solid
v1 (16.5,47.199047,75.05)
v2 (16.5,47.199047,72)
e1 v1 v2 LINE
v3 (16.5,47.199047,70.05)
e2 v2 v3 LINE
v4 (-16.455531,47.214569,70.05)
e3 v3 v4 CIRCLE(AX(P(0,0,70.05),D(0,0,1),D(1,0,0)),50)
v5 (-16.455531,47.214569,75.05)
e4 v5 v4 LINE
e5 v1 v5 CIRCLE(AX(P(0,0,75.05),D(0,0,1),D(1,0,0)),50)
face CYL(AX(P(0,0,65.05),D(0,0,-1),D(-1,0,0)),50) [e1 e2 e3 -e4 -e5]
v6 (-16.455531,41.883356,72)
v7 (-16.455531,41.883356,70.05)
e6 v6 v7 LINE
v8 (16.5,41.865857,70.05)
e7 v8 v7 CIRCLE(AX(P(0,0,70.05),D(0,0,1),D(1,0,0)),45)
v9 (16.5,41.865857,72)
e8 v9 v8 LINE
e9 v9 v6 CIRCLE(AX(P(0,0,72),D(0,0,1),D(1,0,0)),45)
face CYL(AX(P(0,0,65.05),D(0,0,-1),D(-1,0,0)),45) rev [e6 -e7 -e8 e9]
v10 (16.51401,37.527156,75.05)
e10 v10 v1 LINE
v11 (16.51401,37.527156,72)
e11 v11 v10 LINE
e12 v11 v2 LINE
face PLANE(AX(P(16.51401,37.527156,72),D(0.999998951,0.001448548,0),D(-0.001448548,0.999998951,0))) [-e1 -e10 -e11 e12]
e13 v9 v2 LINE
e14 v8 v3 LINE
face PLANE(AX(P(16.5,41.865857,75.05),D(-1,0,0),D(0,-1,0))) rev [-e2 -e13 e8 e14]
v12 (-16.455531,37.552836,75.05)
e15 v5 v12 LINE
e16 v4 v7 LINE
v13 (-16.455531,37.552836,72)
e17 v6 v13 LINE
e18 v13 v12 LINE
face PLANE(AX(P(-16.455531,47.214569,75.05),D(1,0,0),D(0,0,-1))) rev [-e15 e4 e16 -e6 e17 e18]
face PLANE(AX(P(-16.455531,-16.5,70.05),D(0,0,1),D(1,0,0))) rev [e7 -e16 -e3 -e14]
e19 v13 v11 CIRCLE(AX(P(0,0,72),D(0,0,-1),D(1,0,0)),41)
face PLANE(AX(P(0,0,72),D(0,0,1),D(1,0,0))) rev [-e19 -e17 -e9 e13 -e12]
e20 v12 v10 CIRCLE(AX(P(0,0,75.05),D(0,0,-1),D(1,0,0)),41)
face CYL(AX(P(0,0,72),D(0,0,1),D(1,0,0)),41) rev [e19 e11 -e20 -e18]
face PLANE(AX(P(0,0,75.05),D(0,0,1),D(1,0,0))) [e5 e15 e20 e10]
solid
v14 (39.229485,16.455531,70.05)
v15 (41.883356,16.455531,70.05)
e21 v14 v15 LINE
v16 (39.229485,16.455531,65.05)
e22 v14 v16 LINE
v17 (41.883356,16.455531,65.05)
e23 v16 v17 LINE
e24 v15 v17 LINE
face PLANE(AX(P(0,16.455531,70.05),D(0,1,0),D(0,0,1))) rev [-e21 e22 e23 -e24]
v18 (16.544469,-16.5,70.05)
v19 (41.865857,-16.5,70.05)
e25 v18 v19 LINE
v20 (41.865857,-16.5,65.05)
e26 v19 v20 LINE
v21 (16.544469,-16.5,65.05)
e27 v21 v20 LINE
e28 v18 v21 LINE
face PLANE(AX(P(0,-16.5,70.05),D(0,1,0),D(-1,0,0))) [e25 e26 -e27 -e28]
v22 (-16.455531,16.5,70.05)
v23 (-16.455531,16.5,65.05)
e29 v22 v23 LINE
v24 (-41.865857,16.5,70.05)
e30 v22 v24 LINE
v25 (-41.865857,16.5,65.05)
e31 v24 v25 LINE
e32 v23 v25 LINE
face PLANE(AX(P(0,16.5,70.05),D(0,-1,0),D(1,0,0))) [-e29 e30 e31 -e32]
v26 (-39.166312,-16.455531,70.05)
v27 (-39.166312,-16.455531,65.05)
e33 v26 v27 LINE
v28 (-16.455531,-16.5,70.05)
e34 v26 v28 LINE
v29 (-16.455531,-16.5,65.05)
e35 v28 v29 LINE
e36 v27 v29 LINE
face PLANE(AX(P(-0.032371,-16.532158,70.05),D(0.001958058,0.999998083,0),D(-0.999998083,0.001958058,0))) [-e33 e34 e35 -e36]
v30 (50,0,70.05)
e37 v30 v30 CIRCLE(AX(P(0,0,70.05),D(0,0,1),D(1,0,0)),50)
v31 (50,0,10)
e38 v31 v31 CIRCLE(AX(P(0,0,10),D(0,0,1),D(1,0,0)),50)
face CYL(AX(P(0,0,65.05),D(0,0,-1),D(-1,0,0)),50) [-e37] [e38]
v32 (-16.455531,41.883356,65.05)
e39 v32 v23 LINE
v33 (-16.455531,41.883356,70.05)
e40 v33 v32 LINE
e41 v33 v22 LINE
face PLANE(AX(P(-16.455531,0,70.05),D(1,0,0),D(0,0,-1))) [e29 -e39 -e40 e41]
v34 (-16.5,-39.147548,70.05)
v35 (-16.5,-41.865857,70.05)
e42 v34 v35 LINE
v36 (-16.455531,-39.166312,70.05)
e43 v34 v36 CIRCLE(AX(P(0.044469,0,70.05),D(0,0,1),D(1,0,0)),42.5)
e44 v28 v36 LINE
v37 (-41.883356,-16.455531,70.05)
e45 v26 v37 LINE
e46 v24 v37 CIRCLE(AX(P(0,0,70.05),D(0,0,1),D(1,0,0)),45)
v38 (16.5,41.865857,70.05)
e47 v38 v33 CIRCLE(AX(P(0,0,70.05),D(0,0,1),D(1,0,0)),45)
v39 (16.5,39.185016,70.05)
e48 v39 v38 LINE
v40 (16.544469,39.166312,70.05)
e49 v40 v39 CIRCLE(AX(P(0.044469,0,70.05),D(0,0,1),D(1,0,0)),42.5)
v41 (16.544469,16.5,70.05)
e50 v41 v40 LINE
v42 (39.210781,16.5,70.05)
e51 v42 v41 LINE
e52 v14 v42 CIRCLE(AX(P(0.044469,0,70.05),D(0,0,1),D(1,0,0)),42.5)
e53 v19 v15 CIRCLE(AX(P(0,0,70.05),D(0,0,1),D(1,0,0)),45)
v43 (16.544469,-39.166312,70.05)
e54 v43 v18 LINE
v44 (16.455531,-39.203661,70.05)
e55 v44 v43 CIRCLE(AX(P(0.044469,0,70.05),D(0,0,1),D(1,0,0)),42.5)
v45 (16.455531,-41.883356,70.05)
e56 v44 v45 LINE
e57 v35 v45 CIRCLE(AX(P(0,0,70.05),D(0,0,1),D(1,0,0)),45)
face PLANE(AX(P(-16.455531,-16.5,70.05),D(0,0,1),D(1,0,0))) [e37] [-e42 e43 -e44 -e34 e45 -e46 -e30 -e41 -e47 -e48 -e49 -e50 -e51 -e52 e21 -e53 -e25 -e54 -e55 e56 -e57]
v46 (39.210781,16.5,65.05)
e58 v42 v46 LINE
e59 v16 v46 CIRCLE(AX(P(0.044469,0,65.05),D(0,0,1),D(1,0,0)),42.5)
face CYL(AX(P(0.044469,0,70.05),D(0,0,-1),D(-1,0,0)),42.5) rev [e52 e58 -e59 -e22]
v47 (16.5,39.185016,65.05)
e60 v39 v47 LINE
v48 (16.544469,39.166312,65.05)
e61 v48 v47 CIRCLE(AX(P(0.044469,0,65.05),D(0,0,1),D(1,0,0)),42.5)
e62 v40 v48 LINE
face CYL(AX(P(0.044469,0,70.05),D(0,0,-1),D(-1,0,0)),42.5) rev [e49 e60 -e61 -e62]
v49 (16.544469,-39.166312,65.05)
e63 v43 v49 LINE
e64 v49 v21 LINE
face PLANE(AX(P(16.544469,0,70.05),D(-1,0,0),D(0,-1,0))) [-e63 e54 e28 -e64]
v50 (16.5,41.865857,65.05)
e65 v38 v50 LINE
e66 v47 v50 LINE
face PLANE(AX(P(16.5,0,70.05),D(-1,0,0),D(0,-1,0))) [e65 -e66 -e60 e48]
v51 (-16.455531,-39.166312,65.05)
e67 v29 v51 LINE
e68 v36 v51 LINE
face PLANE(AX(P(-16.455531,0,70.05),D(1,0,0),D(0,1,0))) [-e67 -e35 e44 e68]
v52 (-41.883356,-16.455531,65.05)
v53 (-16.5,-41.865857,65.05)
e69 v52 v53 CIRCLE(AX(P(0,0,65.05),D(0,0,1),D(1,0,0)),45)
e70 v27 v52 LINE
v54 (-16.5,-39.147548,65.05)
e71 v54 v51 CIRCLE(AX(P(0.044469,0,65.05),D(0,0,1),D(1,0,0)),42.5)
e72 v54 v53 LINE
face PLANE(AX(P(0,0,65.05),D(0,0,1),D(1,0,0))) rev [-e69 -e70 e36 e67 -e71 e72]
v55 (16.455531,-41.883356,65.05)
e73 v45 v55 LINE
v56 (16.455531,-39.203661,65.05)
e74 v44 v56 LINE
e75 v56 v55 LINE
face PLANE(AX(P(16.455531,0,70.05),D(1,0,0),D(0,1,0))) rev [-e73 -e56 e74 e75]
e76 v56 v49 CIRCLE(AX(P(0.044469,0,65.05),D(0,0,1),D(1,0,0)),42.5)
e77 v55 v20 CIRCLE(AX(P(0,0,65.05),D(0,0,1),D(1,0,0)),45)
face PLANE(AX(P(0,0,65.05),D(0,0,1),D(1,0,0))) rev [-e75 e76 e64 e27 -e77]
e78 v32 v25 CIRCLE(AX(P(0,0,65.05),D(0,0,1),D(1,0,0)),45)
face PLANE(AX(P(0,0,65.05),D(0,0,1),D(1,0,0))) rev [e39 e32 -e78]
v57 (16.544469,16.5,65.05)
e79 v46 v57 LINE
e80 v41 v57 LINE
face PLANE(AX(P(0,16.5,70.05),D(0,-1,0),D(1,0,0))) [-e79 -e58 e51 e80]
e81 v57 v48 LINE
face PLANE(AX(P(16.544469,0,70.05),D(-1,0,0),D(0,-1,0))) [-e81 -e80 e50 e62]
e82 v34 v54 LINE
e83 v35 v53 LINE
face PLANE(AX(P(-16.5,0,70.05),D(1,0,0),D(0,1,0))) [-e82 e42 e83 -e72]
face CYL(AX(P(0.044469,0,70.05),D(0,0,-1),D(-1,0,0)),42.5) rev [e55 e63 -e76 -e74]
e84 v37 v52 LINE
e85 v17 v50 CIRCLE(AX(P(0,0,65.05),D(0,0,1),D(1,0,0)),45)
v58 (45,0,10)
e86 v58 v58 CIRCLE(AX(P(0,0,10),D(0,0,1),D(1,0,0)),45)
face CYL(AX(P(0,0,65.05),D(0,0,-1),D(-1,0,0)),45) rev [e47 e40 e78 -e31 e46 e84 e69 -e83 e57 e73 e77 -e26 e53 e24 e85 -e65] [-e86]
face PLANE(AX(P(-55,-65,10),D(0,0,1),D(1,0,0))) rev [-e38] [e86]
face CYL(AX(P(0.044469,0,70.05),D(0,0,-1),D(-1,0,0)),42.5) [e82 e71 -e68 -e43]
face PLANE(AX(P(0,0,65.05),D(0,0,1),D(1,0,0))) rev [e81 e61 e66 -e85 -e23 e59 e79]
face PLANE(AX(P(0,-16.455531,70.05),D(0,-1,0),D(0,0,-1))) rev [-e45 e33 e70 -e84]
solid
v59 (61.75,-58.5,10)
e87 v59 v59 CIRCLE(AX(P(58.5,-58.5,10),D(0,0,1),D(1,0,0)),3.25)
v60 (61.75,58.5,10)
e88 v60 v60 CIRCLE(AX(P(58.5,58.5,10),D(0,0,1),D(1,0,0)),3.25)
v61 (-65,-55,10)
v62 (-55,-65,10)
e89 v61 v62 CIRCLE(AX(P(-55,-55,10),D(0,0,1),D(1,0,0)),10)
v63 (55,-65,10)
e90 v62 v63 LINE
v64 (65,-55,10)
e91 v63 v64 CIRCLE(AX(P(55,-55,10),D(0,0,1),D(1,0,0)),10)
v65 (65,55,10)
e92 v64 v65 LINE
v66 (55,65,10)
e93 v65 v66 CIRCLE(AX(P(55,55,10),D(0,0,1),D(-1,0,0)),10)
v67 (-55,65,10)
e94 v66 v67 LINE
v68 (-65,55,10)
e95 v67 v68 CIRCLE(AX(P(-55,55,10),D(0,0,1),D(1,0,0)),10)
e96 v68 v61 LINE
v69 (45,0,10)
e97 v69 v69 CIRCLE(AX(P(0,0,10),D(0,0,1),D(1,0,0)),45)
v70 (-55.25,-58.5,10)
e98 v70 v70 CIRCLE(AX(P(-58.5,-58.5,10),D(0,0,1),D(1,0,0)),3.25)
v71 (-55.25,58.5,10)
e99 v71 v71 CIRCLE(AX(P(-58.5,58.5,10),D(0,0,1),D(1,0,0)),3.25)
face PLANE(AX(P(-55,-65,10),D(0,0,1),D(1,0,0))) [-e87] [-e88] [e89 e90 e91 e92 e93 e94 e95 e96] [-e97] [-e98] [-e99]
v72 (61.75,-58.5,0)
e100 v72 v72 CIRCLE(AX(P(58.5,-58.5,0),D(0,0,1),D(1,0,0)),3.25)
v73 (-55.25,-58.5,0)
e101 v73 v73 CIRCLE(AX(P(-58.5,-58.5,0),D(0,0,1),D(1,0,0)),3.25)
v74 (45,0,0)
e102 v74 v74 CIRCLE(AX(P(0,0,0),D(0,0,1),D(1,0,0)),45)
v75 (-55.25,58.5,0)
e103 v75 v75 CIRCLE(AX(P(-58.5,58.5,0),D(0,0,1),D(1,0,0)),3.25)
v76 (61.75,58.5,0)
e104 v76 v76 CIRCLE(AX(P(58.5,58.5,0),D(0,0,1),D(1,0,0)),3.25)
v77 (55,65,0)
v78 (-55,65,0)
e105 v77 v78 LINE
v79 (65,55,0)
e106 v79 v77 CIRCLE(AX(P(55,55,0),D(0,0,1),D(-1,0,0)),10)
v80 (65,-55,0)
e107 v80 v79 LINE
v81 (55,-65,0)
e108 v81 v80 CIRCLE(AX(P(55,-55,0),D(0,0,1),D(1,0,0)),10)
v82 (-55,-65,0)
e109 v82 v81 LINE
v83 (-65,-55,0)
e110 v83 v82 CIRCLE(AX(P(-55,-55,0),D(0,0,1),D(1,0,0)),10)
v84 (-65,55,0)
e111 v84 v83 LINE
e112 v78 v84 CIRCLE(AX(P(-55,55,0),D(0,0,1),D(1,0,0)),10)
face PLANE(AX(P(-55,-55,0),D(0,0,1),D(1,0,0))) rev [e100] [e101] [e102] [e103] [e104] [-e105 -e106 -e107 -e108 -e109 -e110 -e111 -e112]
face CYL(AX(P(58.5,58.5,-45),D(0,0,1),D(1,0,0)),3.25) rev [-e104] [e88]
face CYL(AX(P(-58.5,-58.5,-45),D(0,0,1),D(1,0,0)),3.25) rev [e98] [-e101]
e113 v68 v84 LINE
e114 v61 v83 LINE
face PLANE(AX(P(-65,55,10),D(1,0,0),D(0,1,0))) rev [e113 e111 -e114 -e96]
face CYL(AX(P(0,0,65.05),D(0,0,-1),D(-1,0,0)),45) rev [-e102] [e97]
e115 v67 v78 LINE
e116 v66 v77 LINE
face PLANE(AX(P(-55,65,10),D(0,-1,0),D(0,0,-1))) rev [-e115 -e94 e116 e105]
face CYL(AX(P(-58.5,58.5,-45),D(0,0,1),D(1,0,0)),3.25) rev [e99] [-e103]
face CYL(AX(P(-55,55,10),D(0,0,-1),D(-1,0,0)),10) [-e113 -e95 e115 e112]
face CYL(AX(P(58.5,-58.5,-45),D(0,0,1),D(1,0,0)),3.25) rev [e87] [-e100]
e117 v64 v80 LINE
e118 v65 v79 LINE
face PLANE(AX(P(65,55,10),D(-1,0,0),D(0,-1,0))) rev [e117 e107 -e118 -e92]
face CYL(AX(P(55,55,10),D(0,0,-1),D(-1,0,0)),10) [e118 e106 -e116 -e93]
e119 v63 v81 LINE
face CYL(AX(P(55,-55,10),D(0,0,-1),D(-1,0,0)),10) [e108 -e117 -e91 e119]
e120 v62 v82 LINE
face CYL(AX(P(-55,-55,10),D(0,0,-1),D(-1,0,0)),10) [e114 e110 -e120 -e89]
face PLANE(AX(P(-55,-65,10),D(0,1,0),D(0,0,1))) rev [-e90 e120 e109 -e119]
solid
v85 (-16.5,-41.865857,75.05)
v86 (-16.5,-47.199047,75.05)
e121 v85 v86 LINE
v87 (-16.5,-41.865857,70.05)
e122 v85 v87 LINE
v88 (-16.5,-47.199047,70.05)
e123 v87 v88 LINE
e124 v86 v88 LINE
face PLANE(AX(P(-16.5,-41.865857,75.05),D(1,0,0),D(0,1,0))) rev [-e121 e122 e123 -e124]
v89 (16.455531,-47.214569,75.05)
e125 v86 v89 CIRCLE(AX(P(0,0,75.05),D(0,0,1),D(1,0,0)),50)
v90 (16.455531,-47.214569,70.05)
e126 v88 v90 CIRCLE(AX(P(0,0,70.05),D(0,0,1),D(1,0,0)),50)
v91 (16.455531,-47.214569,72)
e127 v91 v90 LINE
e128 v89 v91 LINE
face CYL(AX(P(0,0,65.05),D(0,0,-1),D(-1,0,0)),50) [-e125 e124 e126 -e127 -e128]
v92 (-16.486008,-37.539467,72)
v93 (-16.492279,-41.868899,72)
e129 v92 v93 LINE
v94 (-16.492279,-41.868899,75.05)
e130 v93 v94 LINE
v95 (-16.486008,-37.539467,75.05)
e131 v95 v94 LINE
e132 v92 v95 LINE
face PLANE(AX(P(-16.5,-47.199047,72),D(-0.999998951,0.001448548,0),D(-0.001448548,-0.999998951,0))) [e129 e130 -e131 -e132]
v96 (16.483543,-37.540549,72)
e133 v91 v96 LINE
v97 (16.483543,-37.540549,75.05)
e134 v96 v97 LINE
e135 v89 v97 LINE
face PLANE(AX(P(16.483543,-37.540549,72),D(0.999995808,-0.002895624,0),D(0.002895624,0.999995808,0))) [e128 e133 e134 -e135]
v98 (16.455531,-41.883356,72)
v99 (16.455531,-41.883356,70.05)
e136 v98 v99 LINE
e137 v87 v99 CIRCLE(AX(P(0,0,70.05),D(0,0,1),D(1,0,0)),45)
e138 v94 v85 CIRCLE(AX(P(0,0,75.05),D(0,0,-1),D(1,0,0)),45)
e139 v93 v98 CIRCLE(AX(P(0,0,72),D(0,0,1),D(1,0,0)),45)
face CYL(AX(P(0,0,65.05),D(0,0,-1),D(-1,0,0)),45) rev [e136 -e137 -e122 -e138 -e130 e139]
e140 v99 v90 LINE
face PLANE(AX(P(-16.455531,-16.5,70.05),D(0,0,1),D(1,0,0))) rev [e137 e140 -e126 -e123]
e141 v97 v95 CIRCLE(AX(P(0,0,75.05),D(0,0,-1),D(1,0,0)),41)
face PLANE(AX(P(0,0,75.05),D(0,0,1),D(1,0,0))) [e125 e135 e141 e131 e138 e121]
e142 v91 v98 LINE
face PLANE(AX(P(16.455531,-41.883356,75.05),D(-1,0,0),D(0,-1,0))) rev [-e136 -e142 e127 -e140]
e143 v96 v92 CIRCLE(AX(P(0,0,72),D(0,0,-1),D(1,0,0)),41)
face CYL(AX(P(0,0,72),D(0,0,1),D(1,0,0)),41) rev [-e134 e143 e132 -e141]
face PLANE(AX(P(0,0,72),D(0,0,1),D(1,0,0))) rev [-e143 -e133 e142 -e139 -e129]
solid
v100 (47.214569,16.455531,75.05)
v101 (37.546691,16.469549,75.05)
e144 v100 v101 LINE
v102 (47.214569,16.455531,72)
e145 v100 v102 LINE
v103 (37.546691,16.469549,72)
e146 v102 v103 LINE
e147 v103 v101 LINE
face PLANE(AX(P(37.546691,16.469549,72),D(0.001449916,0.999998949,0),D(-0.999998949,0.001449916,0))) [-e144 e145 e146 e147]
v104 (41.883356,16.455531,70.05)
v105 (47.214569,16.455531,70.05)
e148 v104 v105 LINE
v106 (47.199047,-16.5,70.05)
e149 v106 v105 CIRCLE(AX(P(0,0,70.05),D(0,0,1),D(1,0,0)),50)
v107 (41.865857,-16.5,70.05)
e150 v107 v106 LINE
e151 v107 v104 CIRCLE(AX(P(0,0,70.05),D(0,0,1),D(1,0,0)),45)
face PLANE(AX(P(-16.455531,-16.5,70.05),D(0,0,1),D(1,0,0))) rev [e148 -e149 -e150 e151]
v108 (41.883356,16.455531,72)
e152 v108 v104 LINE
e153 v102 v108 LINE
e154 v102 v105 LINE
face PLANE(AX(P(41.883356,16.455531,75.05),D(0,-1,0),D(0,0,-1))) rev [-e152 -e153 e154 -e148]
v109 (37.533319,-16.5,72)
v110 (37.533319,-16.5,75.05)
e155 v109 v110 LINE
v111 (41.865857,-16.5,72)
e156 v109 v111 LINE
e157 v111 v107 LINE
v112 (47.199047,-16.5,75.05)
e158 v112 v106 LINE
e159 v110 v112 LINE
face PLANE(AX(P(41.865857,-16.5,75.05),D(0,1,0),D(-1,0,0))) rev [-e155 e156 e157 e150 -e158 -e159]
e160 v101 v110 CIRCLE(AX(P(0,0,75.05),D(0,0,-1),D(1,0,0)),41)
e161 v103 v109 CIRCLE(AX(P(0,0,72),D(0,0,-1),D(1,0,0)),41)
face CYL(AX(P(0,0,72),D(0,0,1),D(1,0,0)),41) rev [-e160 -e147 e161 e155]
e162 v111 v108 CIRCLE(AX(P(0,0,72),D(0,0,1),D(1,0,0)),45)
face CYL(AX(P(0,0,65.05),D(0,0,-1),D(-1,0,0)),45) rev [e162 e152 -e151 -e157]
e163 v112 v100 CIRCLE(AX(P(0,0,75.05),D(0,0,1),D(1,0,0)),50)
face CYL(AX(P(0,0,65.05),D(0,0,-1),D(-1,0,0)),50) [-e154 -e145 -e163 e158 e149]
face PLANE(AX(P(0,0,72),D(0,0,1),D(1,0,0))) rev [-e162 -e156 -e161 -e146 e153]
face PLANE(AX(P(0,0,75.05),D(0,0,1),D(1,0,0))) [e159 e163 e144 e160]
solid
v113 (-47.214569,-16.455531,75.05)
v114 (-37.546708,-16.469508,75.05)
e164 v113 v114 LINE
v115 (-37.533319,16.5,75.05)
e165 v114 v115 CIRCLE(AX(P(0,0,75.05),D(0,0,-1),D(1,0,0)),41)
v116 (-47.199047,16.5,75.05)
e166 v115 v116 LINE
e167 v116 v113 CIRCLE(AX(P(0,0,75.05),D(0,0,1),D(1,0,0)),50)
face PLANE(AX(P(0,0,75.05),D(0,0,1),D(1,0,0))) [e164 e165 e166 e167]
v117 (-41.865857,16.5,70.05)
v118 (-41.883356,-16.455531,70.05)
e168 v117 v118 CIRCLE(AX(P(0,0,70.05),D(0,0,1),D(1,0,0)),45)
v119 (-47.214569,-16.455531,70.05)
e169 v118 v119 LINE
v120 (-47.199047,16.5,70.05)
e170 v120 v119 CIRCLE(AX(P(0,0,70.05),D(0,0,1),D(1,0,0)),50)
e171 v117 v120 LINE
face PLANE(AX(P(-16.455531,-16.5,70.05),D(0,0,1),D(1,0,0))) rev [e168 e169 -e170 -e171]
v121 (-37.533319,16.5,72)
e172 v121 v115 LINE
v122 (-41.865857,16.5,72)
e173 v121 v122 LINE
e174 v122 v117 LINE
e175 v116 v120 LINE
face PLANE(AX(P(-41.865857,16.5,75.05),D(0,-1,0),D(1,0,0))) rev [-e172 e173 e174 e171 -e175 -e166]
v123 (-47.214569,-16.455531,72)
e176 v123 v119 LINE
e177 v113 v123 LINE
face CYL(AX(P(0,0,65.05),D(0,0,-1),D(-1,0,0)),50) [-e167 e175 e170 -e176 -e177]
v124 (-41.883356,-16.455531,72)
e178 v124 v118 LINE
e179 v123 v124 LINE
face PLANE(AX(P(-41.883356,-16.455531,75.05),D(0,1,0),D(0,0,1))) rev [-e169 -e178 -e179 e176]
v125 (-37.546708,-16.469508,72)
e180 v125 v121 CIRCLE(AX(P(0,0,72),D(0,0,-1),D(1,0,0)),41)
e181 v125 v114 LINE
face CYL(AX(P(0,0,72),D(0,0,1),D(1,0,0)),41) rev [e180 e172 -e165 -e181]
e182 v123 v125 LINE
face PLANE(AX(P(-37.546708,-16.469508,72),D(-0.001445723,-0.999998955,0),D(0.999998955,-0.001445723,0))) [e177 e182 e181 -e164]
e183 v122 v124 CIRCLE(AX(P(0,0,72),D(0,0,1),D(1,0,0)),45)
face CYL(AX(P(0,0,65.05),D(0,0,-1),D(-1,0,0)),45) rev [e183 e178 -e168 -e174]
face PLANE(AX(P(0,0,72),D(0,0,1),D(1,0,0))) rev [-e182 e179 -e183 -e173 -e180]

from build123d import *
from build123d.topology import SkipClean

# Parameters (mm, degrees)
DODANIE_WYCI_GNI_CIE2_DEPTH = 10
SZKIC2_R                    = 50
SZKIC2_R_2                  = 45
DODANIE_WYCI_GNI_CIE3_DEPTH = 55.05
SZKIC4_R                    = 3.25
WYTNIJ_WYCI_GNI_CIE2_DEPTH  = 55
DODANIE_WYCI_GNI_CIE4_DEPTH = 5
SZKIC8_R                    = 45
WYTNIJ_WYCI_GNI_CIE3_DEPTH  = 110.799829235
DODANIE_WYCI_GNI_CIE5_DEPTH = 10
DODANIE_WYCI_GNI_CIE6_START = -3.05
DODANIE_WYCI_GNI_CIE6_DEPTH = 3.05
PODZIEL1_OUTLINE_R          = 3.25
PODZIEL1_OUTLINE_R_2        = 45
PODZIEL1_DEPTH              = 10
PODZIEL1_2_OUTLINE_R        = 3.25
PODZIEL1_2_DEPTH            = 10
PODZIEL1_START              = 70.05
PODZIEL1_3_OUTLINE_R        = 3.25
PODZIEL1_3_DEPTH            = 5
PODZIEL1_START_2            = 72
PODZIEL1_4_DEPTH            = 3.05
PODZIEL1_5_DEPTH            = 1.95
PODZIEL1_6_DEPTH            = 3.05
PODZIEL1_7_DEPTH            = 1.95
PODZIEL1_8_DEPTH            = 3.05
PODZIEL1_9_DEPTH            = 1.95
PODZIEL1_10_DEPTH           = 3.05
PODZIEL1_11_DEPTH           = 1.95


# Read off the part's stored shape, not the designer's step: Podziel1
with BuildPart() as part:
    # Szkic1 → Dodanie-wyciągnięcie2 (new body)
    with BuildSketch(Plane.XY):
        with BuildLine():
            Line((-55, 65), (55, 65))
            ThreePointArc((55, 65), (62.071067812, 62.071067812), (65, 55))
            Line((65, 55), (65, -55))
            ThreePointArc((65, -55), (62.071067812, -62.071067812), (55, -65))
            Line((55, -65), (-55, -65))
            ThreePointArc((-55, -65), (-62.071067812, -62.071067812), (-65, -55))
            Line((-65, -55), (-65, 55))
            ThreePointArc((-65, 55), (-62.071067812, 62.071067812), (-55, 65))
        make_face()
    extrude(amount=DODANIE_WYCI_GNI_CIE2_DEPTH)

    # Szkic2 → Dodanie-wyciągnięcie3 (add)
    with BuildSketch(Plane.XY.offset(10)):
        Circle(SZKIC2_R)
        Circle(SZKIC2_R_2, mode=Mode.SUBTRACT)
    extrude(amount=DODANIE_WYCI_GNI_CIE3_DEPTH)

    # Szkic4 → Wytnij-wyciągnięcie2 (cut)
    with BuildSketch(Plane.XY.offset(10)):
        with Locations((-58.5, 58.5)):
            Circle(SZKIC4_R)
        with Locations((58.5, 58.5)):
            Circle(SZKIC4_R)
        with Locations((58.5, -58.5)):
            Circle(SZKIC4_R)
        with Locations((-58.5, -58.5)):
            Circle(SZKIC4_R)
    extrude(amount=-WYTNIJ_WYCI_GNI_CIE2_DEPTH, mode=Mode.SUBTRACT)

    # Szkic7 → Dodanie-wyciągnięcie4 (add)
    with BuildSketch(Plane.XY.offset(65.05)):
        with BuildLine():
            Line((-16.455530898, 16.5), (-16.455530898, 47.214568757))
            ThreePointArc((-16.455530898, 47.214568757), (-35.338682666, 35.371987609), (-47.199046601, 16.5))
            Line((-47.199046601, 16.5), (-16.455530898, 16.5))
        make_face()
        with BuildLine():
            ThreePointArc((16.5, 39.185016306), (16.522237205, 39.17567049), (16.544469102, 39.166312055))
            Line((16.544469102, 39.166312055), (16.544469102, 16.5))
            Line((16.544469102, 16.5), (39.210781157, 16.5))
            ThreePointArc((39.210781157, 16.5), (39.220139592, 16.477768103), (39.229485408, 16.455530898))
            Line((39.229485408, 16.455530898), (47.214568757, 16.455530898))
            ThreePointArc((47.214568757, 16.455530898), (35.371987609, 35.338682666), (16.5, 47.199046601))
            Line((16.5, 47.199046601), (16.5, 39.185016306))
        make_face()
        with BuildLine():
            ThreePointArc((-16.5, -39.147548354), (-16.477768113, -39.156936517), (-16.455530898, -39.166312055))
            Line((-16.455530898, -39.166312055), (-16.455530898, -16.5))
            Line((-16.455530898, -16.5), (-39.166312055, -16.455530898))
            Line((-39.166312055, -16.455530898), (-47.214568757, -16.455530898))
            ThreePointArc((-47.214568757, -16.455530898), (-35.371987609, -35.338682666), (-16.5, -47.199046601))
            Line((-16.5, -47.199046601), (-16.5, -39.147548354))
        make_face()
        with BuildLine():
            Line((16.544469102, -16.5), (16.544469102, -39.166312055))
            ThreePointArc((16.544469102, -39.166312055), (16.500010596, -39.185011856), (16.455530898, -39.20366119))
            Line((16.455530898, -39.20366119), (16.455530898, -47.214568757))
            ThreePointArc((16.455530898, -47.214568757), (35.338682666, -35.371987609), (47.199046601, -16.5))
            Line((47.199046601, -16.5), (16.544469102, -16.5))
        make_face()
    extrude(amount=DODANIE_WYCI_GNI_CIE4_DEPTH)

    # Szkic8 → Wytnij-wyciągnięcie3 (cut, through all)
    with SkipClean():  # the faces are left unmerged after this step: merging them gives an invalid solid
        with BuildSketch(Plane.XY.offset(10)):
            with Locations(Location((0, 0, 0), (0, 0, 201.449342522))):
                Circle(SZKIC8_R)
        extrude(amount=-WYTNIJ_WYCI_GNI_CIE3_DEPTH, mode=Mode.SUBTRACT)
    add(part.part.scale(1), mode=Mode.REPLACE)  # the faces are merged on a copy

    # Szkic9 → Dodanie-wyciągnięcie5 (add)
    with SkipClean():  # the faces are left unmerged after this step: merging them gives an invalid solid
        with BuildSketch(Plane.XY.offset(65.05)):
            with BuildLine():
                Line((-41.883355917, -16.455530898), (-47.214568757, -16.455530898))
                ThreePointArc((-47.214568757, -16.455530898), (-49.999994454, 0.023550151), (-47.199046601, 16.5))
                Line((-47.199046601, 16.5), (-41.865857211, 16.5))
                ThreePointArc((-41.865857211, 16.5), (-44.999993656, 0.023894067), (-41.883355917, -16.455530898))
            make_face()
            with BuildLine():
                Line((16.455530898, -41.883355917), (16.455530898, -47.214568757))
                ThreePointArc((16.455530898, -47.214568757), (-0.023550151, -49.999994454), (-16.5, -47.199046601))
                Line((-16.5, -47.199046601), (-16.5, -41.865857211))
                ThreePointArc((-16.5, -41.865857211), (-0.023894067, -44.999993656), (16.455530898, -41.883355917))
            make_face()
            with BuildLine():
                Line((41.865857211, -16.5), (47.199046601, -16.5))
                ThreePointArc((47.199046601, -16.5), (49.999994454, -0.023550151), (47.214568757, 16.455530898))
                Line((47.214568757, 16.455530898), (41.883355917, 16.455530898))
                ThreePointArc((41.883355917, 16.455530898), (44.999993656, -0.023894067), (41.865857211, -16.5))
            make_face()
            with BuildLine():
                Line((16.5, 41.865857211), (16.5, 47.199046601))
                ThreePointArc((16.5, 47.199046601), (0.023550151, 49.999994454), (-16.455530898, 47.214568757))
                Line((-16.455530898, 47.214568757), (-16.455530898, 41.883355917))
                ThreePointArc((-16.455530898, 41.883355917), (0.023894067, 44.999993656), (16.5, 41.865857211))
            make_face()
        extrude(amount=DODANIE_WYCI_GNI_CIE5_DEPTH)

    # Szkic10 → Dodanie-wyciągnięcie6 (add)
    with SkipClean():  # the faces are left unmerged after this step: merging them gives an invalid solid
        with BuildSketch(Plane.XY.offset(75.05).offset(DODANIE_WYCI_GNI_CIE6_START)):
            with BuildLine():
                Line((-37.546708344, -16.469507963), (-47.214568757, -16.455530898))
                ThreePointArc((-47.214568757, -16.455530898), (-49.999994454, 0.023550151), (-47.199046601, 16.5))
                Line((-47.199046601, 16.5), (-37.533318532, 16.5))
                ThreePointArc((-37.533318532, 16.5), (-40.999996619, 0.016651212), (-37.546708344, -16.469507963))
            make_face()
            with BuildLine():
                Line((-16.5, -47.199046601), (-16.486007616, -37.539466604))
                ThreePointArc((-16.486007616, -37.539466604), (-0.001345704, -40.999999978), (16.483543336, -37.540548732))
                Line((16.483543336, -37.540548732), (16.455530898, -47.214568757))
                ThreePointArc((16.455530898, -47.214568757), (-0.023550151, -49.999994454), (-16.5, -47.199046601))
            make_face()
            with BuildLine():
                Line((47.199046601, -16.5), (37.533318532, -16.5))
                ThreePointArc((37.533318532, -16.5), (40.999996628, -0.016629068), (37.546690554, 16.46954852))
                Line((37.546690554, 16.46954852), (47.214568757, 16.455530898))
                ThreePointArc((47.214568757, 16.455530898), (49.999994454, -0.023550151), (47.199046601, -16.5))
            make_face()
            with BuildLine():
                Line((-16.455530898, 47.214568757), (-16.455530898, 37.552836149))
                ThreePointArc((-16.455530898, 37.552836149), (0.031934624, 40.999987563), (16.514010216, 37.527156388))
                Line((16.514010216, 37.527156388), (16.5, 47.199046601))
                ThreePointArc((16.5, 47.199046601), (0.023550151, 49.999994454), (-16.455530898, 47.214568757))
            make_face()
        extrude(amount=DODANIE_WYCI_GNI_CIE6_DEPTH)

    # Podziel1 2 outline → Podziel1 2 (cut)
    with SkipClean():  # the faces are left unmerged after this step: merging them gives an invalid solid
        with BuildSketch(Plane.XY):
            with BuildLine():
                ThreePointArc((-65, -55), (-62.071067812, -62.071067812), (-55, -65))
                Line((-55, -65), (55, -65))
                ThreePointArc((55, -65), (62.071067812, -62.071067812), (65, -55))
                Line((65, -55), (65, 55))
                ThreePointArc((65, 55), (62.071067812, 62.071067812), (55, 65))
                Line((55, 65), (-55, 65))
                ThreePointArc((-55, 65), (-62.071067812, 62.071067812), (-65, 55))
                Line((-65, 55), (-65, -55))
            make_face()
            with BuildLine():
                ThreePointArc((41.865857211, -16.5), (17.936369644, -41.270893424), (-16.5, -41.865857211))
                ThreePointArc((-16.5, -41.865857211), (-41.270893424, -17.936369644), (-41.865857211, 16.5))
                ThreePointArc((-41.865857211, 16.5), (-31.802905011, 31.836696325), (-16.455530898, 41.883355917))
                ThreePointArc((-16.455530898, 41.883355917), (31.836696325, 31.802905011), (41.865857211, -16.5))
            make_face(mode=Mode.SUBTRACT)
            with Locations((-58.5, -58.5)):
                Circle(PODZIEL1_2_OUTLINE_R, mode=Mode.SUBTRACT)
            with Locations((58.5, -58.5)):
                Circle(PODZIEL1_2_OUTLINE_R, mode=Mode.SUBTRACT)
            with Locations((-58.5, 58.5)):
                Circle(PODZIEL1_2_OUTLINE_R, mode=Mode.SUBTRACT)
            with Locations((58.5, 58.5)):
                Circle(PODZIEL1_2_OUTLINE_R, mode=Mode.SUBTRACT)
        extrude(amount=PODZIEL1_2_DEPTH, mode=Mode.SUBTRACT)

    # Podziel1 3 outline → Podziel1 3 (cut)
    with SkipClean():  # the faces are left unmerged after this step: merging them gives an invalid solid
        with BuildSketch(Plane.XY.offset(PODZIEL1_START)):
            with BuildLine():
                ThreePointArc((-65, -55), (-62.071067812, -62.071067812), (-55, -65))
                Line((-55, -65), (55, -65))
                ThreePointArc((55, -65), (62.071067812, -62.071067812), (65, -55))
                Line((65, -55), (65, 55))
                ThreePointArc((65, 55), (62.071067812, 62.071067812), (55, 65))
                Line((55, 65), (-55, 65))
                ThreePointArc((-55, 65), (-62.071067812, 62.071067812), (-65, 55))
                Line((-65, 55), (-65, -55))
            make_face()
            with BuildLine():
                Line((37.533318532, -16.5), (41.865857211, -16.5))
                ThreePointArc((41.865857211, -16.5), (31.808778722, -31.830827765), (16.47098574, -41.87728058))
                Line((16.47098574, -41.87728058), (16.483543336, -37.540548732))
                ThreePointArc((16.483543336, -37.540548732), (-0.001345704, -40.999999978), (-16.486007616, -37.539466604))
                Line((-16.486007616, -37.539466604), (-16.492279016, -41.868899351))
                ThreePointArc((-16.492279016, -41.868899351), (-16.496139578, -41.867378459), (-16.5, -41.865857211))
                ThreePointArc((-16.5, -41.865857211), (-31.8337682, -31.805835977), (-41.880325193, -16.463242746))
                Line((-41.880325193, -16.463242746), (-37.546708344, -16.469507963))
                ThreePointArc((-37.546708344, -16.469507963), (-40.999996619, 0.016651212), (-37.533318532, 16.5))
                Line((-37.533318532, 16.5), (-41.865857211, 16.5))
                ThreePointArc((-41.865857211, 16.5), (-31.802905011, 31.836696325), (-16.455530898, 41.883355917))
                Line((-16.455530898, 41.883355917), (-16.455530898, 37.552836149))
                ThreePointArc((-16.455530898, 37.552836149), (0.031934624, 40.999987563), (16.514010216, 37.527156388))
                Line((16.514010216, 37.527156388), (16.507729805, 41.862809947))
                ThreePointArc((16.507729805, 41.862809947), (31.836695874, 31.802905462), (41.880316397, 16.463265122))
                Line((41.880316397, 16.463265122), (37.546690554, 16.46954852))
                ThreePointArc((37.546690554, 16.46954852), (40.999996628, -0.016629068), (37.533318532, -16.5))
            make_face(mode=Mode.SUBTRACT)
            with Locations((-58.5, -58.5)):
                Circle(PODZIEL1_3_OUTLINE_R, mode=Mode.SUBTRACT)
            with Locations((58.5, -58.5)):
                Circle(PODZIEL1_3_OUTLINE_R, mode=Mode.SUBTRACT)
            with Locations((-58.5, 58.5)):
                Circle(PODZIEL1_3_OUTLINE_R, mode=Mode.SUBTRACT)
            with Locations((58.5, 58.5)):
                Circle(PODZIEL1_3_OUTLINE_R, mode=Mode.SUBTRACT)
        extrude(amount=PODZIEL1_3_DEPTH, mode=Mode.SUBTRACT)


with BuildPart() as body_2:
    # Podziel1 outline → Podziel1 (new body)
    with BuildSketch(Plane.XY):
        with BuildLine():
            Line((-55, -65), (55, -65))
            ThreePointArc((55, -65), (62.071067812, -62.071067812), (65, -55))
            Line((65, -55), (65, 55))
            ThreePointArc((65, 55), (62.071067812, 62.071067812), (55, 65))
            Line((55, 65), (-55, 65))
            ThreePointArc((-55, 65), (-62.071067812, 62.071067812), (-65, 55))
            Line((-65, 55), (-65, -55))
            ThreePointArc((-65, -55), (-62.071067812, -62.071067812), (-55, -65))
        make_face()
        with Locations((-58.5, -58.5)):
            Circle(PODZIEL1_OUTLINE_R, mode=Mode.SUBTRACT)
        with Locations((58.5, -58.5)):
            Circle(PODZIEL1_OUTLINE_R, mode=Mode.SUBTRACT)
        with Locations((-58.5, 58.5)):
            Circle(PODZIEL1_OUTLINE_R, mode=Mode.SUBTRACT)
        Circle(PODZIEL1_OUTLINE_R_2, mode=Mode.SUBTRACT)
        with Locations((58.5, 58.5)):
            Circle(PODZIEL1_OUTLINE_R, mode=Mode.SUBTRACT)
    extrude(amount=PODZIEL1_DEPTH)


with BuildPart() as body_3:
    # Podziel1 4 outline → Podziel1 4 (new body)
    with BuildSketch(Plane.XY.offset(PODZIEL1_START_2)):
        with BuildLine():
            Line((37.533318532, -16.5), (47.199046601, -16.5))
            ThreePointArc((47.199046601, -16.5), (49.999994454, -0.023550151), (47.214568757, 16.455530898))
            Line((47.214568757, 16.455530898), (37.546690554, 16.46954852))
            ThreePointArc((37.546690554, 16.46954852), (40.999996628, -0.016629068), (37.533318532, -16.5))
        make_face()
    extrude(amount=PODZIEL1_4_DEPTH)

    # Podziel1 5 outline → Podziel1 5 (add)
    with BuildSketch(Plane.XY.offset(PODZIEL1_START)):
        with BuildLine():
            ThreePointArc((47.199046601, -16.5), (49.999994454, -0.023550151), (47.214568757, 16.455530898))
            Line((47.214568757, 16.455530898), (41.883355917, 16.455530898))
            ThreePointArc((41.883355917, 16.455530898), (44.999993656, -0.023894067), (41.865857211, -16.5))
            Line((41.865857211, -16.5), (47.199046601, -16.5))
        make_face()
    extrude(amount=PODZIEL1_5_DEPTH)


with BuildPart() as body_4:
    # Podziel1 6 outline → Podziel1 6 (new body)
    with BuildSketch(Plane.XY.offset(PODZIEL1_START_2)):
        with BuildLine():
            ThreePointArc((16.483543336, -37.540548732), (-0.001345704, -40.999999978), (-16.486007616, -37.539466604))
            Line((-16.486007616, -37.539466604), (-16.492279016, -41.868899351))
            ThreePointArc((-16.492279016, -41.868899351), (-16.496139578, -41.867378459), (-16.5, -41.865857211))
            Line((-16.5, -41.865857211), (-16.5, -47.199046601))
            ThreePointArc((-16.5, -47.199046601), (-0.023550151, -49.999994454), (16.455530898, -47.214568757))
            Line((16.455530898, -47.214568757), (16.483543336, -37.540548732))
        make_face()
    extrude(amount=PODZIEL1_6_DEPTH)

    # Podziel1 7 outline → Podziel1 7 (add)
    with BuildSketch(Plane.XY.offset(PODZIEL1_START)):
        with BuildLine():
            ThreePointArc((16.455530898, -41.883355917), (-0.023894067, -44.999993656), (-16.5, -41.865857211))
            Line((-16.5, -41.865857211), (-16.5, -47.199046601))
            ThreePointArc((-16.5, -47.199046601), (-0.023550151, -49.999994454), (16.455530898, -47.214568757))
            Line((16.455530898, -47.214568757), (16.455530898, -41.883355917))
        make_face()
    extrude(amount=PODZIEL1_7_DEPTH)


with BuildPart() as body_5:
    # Podziel1 8 outline → Podziel1 8 (new body)
    with BuildSketch(Plane.XY.offset(PODZIEL1_START_2)):
        with BuildLine():
            Line((-37.533318532, 16.5), (-47.199046601, 16.5))
            ThreePointArc((-47.199046601, 16.5), (-49.999994454, 0.023550151), (-47.214568757, -16.455530898))
            Line((-47.214568757, -16.455530898), (-37.546708344, -16.469507963))
            ThreePointArc((-37.546708344, -16.469507963), (-40.999996619, 0.016651212), (-37.533318532, 16.5))
        make_face()
    extrude(amount=PODZIEL1_8_DEPTH)

    # Podziel1 9 outline → Podziel1 9 (add)
    with BuildSketch(Plane.XY.offset(PODZIEL1_START)):
        with BuildLine():
            ThreePointArc((-47.199046601, 16.5), (-49.999994454, 0.023550151), (-47.214568757, -16.455530898))
            Line((-47.214568757, -16.455530898), (-41.883355917, -16.455530898))
            ThreePointArc((-41.883355917, -16.455530898), (-44.999993656, 0.023894067), (-41.865857211, 16.5))
            Line((-41.865857211, 16.5), (-47.199046601, 16.5))
        make_face()
    extrude(amount=PODZIEL1_9_DEPTH)


with BuildPart() as body_6:
    # Podziel1 10 outline → Podziel1 10 (new body)
    with BuildSketch(Plane.XY.offset(PODZIEL1_START_2)):
        with BuildLine():
            ThreePointArc((-16.455530898, 37.552836149), (0.031934624, 40.999987563), (16.514010216, 37.527156388))
            Line((16.514010216, 37.527156388), (16.5, 47.199046601))
            ThreePointArc((16.5, 47.199046601), (0.023550151, 49.999994454), (-16.455530898, 47.214568757))
            Line((-16.455530898, 47.214568757), (-16.455530898, 37.552836149))
        make_face()
    extrude(amount=PODZIEL1_10_DEPTH)

    # Podziel1 11 outline → Podziel1 11 (add)
    with BuildSketch(Plane.XY.offset(PODZIEL1_START)):
        with BuildLine():
            Line((16.5, 41.865857211), (16.5, 47.199046601))
            ThreePointArc((16.5, 47.199046601), (0.023550151, 49.999994454), (-16.455530898, 47.214568757))
            Line((-16.455530898, 47.214568757), (-16.455530898, 41.883355917))
            ThreePointArc((-16.455530898, 41.883355917), (0.023894067, 44.999993656), (16.5, 41.865857211))
        make_face()
    extrude(amount=PODZIEL1_11_DEPTH)


solid = Compound([part.part, body_2.part, body_3.part, body_4.part, body_5.part, body_6.part])
